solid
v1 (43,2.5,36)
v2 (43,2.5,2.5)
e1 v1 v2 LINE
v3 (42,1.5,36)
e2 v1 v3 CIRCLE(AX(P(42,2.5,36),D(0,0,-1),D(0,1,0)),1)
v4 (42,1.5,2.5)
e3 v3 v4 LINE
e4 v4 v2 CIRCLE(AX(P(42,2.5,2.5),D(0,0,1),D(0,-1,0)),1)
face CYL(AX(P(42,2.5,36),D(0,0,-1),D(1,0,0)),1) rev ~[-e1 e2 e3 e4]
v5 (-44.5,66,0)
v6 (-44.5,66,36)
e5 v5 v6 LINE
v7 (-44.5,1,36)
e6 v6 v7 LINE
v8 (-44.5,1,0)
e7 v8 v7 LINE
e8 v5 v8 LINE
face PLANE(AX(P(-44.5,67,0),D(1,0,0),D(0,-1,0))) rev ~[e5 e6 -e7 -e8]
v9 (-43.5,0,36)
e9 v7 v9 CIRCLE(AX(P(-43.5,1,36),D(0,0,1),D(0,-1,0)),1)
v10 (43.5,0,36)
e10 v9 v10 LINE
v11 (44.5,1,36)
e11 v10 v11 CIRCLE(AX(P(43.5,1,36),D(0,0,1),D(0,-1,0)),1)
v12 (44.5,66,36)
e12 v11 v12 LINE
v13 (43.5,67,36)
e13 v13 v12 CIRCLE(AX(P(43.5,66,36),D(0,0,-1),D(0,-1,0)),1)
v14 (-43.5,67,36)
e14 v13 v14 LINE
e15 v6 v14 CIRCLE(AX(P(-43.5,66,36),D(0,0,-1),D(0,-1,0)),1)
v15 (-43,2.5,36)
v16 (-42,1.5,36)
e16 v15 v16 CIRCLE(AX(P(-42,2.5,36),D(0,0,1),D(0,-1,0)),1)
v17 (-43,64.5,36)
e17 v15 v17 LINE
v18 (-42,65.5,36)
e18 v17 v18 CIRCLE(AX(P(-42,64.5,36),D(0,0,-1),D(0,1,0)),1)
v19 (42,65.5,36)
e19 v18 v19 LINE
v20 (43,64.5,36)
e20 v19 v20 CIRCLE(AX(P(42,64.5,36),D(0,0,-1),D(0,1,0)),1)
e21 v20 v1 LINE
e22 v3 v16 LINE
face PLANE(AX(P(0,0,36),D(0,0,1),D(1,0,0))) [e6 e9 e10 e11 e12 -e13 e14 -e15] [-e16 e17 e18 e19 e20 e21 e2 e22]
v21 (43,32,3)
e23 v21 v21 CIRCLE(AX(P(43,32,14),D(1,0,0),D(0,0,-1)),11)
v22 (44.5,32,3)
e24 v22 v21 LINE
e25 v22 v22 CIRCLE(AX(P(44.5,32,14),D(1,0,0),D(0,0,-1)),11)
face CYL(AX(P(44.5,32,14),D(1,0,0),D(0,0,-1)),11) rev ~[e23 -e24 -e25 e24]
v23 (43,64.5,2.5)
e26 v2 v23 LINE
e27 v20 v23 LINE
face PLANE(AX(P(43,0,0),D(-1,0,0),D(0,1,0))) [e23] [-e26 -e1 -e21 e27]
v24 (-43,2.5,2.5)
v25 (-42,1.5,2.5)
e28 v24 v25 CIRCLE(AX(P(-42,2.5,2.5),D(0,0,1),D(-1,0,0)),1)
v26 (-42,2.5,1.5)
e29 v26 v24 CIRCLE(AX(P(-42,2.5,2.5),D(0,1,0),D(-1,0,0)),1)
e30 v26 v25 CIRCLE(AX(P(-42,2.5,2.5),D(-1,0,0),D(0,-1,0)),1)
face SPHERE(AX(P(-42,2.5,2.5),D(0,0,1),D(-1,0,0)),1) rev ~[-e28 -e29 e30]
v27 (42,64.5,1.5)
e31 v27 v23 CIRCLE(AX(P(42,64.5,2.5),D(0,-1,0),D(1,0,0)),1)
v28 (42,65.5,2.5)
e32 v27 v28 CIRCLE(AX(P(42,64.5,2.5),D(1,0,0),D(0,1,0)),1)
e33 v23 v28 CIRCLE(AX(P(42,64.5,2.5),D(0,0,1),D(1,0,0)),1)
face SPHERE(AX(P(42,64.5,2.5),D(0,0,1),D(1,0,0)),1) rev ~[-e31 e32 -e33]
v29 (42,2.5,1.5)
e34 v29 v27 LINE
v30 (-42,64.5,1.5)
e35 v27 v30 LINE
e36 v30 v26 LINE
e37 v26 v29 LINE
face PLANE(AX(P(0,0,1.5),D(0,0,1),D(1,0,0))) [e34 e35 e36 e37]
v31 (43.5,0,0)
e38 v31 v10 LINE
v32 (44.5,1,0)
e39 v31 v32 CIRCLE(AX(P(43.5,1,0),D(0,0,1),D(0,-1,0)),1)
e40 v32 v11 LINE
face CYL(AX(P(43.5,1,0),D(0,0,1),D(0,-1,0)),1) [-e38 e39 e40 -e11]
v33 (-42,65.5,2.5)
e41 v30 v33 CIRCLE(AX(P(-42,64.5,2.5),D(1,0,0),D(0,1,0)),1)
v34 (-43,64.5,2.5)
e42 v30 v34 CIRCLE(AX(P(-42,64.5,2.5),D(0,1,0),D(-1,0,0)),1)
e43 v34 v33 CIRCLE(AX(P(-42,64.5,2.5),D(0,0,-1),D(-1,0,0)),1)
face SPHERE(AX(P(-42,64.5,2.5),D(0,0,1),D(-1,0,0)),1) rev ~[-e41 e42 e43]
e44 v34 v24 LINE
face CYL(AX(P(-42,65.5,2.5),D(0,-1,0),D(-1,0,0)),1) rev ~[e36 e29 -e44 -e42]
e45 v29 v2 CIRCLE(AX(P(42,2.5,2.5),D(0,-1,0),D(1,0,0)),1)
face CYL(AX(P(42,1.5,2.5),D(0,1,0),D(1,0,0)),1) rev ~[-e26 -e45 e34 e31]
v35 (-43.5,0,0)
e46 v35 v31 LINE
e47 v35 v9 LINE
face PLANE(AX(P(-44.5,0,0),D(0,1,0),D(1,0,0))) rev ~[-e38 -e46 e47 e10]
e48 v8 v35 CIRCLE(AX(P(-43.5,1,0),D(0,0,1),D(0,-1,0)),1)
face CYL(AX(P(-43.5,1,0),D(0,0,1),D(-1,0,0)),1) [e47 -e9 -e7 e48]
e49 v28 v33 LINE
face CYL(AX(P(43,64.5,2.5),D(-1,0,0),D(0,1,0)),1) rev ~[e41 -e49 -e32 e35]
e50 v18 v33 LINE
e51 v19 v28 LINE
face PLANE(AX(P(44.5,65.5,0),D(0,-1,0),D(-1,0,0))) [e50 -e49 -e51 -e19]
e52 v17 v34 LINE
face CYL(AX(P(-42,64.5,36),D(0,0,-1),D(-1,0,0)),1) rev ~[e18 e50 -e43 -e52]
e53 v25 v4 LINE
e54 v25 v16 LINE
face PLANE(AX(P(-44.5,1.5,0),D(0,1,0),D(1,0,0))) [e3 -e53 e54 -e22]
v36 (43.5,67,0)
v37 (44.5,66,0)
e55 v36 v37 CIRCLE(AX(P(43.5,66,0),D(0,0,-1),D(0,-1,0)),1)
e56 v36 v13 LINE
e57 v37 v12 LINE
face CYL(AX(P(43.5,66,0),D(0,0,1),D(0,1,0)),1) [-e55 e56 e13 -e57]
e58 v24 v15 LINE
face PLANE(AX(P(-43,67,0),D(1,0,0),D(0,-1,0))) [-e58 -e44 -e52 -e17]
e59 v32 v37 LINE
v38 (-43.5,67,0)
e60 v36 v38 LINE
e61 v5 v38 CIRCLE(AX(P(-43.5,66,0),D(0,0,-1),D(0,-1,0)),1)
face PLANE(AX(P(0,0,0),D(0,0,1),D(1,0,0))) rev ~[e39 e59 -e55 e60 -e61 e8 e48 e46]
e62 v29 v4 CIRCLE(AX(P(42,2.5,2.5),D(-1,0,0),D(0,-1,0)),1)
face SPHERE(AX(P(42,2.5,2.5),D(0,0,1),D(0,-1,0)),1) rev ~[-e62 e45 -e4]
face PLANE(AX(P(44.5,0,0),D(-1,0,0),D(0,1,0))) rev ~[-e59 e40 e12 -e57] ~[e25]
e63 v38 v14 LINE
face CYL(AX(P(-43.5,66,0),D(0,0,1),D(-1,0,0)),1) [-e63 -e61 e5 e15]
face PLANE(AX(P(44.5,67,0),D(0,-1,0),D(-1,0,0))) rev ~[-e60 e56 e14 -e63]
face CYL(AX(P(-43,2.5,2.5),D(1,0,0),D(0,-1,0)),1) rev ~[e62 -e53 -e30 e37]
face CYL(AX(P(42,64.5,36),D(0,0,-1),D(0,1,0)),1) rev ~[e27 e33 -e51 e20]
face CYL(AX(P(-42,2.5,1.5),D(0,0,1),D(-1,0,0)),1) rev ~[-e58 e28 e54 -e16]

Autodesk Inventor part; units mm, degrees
ref_plane "YZ Plane" through (0, 0, 0) normal (1, 0, 0) x (0, 1, 0)
ref_plane "XZ Plane" through (0, 0, 0) normal (0, 1, 0) x (-1, 0, 0)
ref_plane "XY Plane" through (0, 0, 0) normal (0, 0, 1) x (1, 0, 0)
sketch "Skizze2" plane through (0, 0, 0) normal (0, 0, 1) x (1, 0, 0)
  line L0 (-44.5, 0) -> (44.5, 0)
  line L1 (44.5, 0) -> (44.5, 67)
  line L2 (44.5, 67) -> (-44.5, 67)
  line L3 (-44.5, 67) -> (-44.5, 0)
  point P0 (0, 0)
  point P1 (0, 0)
  dimension "d0" = 89
  dimension "d1" = 67
extrude "Extrusion1" add sketch "Skizze2" along normal blind 36
shell "Wandung1" thickness 1.5 removed faces 1 at (-14.8333, 44.6667, 36)
sketch "Skizze3" plane through (44.5, 0, 0) normal (1, 0, 0) x (0, 0, -1)
  circle A0 centre (-14, 32) radius 11
  line L0 (0, 0) -> (0, 67) projected
  line L1 (0, 67) -> (-36, 67) projected
  dimension "d5" = 22
  dimension "d6" = 14
  dimension "d7" = 35
extrude "Extrusion2" cut sketch "Skizze3" against normal up to surface (1.5 mm away)
fillet "Rundung1" radius 1 12 edges at (44.5, 67, 18) (44.5, 0, 18) (-44.5, 0, 18) (-44.5, 67, 18) (-43, 65.5, 18.75) (43, 65.5, 18.75) (43, 1.5, 18.75) (-43, 1.5, 18.75) (-43, 33.5, 1.5) (0, 1.5, 1.5) (43, 33.5, 1.5) (0, 65.5, 1.5)
properties part number "102 part 1" material "Aluminum 6061, geschweißt"
